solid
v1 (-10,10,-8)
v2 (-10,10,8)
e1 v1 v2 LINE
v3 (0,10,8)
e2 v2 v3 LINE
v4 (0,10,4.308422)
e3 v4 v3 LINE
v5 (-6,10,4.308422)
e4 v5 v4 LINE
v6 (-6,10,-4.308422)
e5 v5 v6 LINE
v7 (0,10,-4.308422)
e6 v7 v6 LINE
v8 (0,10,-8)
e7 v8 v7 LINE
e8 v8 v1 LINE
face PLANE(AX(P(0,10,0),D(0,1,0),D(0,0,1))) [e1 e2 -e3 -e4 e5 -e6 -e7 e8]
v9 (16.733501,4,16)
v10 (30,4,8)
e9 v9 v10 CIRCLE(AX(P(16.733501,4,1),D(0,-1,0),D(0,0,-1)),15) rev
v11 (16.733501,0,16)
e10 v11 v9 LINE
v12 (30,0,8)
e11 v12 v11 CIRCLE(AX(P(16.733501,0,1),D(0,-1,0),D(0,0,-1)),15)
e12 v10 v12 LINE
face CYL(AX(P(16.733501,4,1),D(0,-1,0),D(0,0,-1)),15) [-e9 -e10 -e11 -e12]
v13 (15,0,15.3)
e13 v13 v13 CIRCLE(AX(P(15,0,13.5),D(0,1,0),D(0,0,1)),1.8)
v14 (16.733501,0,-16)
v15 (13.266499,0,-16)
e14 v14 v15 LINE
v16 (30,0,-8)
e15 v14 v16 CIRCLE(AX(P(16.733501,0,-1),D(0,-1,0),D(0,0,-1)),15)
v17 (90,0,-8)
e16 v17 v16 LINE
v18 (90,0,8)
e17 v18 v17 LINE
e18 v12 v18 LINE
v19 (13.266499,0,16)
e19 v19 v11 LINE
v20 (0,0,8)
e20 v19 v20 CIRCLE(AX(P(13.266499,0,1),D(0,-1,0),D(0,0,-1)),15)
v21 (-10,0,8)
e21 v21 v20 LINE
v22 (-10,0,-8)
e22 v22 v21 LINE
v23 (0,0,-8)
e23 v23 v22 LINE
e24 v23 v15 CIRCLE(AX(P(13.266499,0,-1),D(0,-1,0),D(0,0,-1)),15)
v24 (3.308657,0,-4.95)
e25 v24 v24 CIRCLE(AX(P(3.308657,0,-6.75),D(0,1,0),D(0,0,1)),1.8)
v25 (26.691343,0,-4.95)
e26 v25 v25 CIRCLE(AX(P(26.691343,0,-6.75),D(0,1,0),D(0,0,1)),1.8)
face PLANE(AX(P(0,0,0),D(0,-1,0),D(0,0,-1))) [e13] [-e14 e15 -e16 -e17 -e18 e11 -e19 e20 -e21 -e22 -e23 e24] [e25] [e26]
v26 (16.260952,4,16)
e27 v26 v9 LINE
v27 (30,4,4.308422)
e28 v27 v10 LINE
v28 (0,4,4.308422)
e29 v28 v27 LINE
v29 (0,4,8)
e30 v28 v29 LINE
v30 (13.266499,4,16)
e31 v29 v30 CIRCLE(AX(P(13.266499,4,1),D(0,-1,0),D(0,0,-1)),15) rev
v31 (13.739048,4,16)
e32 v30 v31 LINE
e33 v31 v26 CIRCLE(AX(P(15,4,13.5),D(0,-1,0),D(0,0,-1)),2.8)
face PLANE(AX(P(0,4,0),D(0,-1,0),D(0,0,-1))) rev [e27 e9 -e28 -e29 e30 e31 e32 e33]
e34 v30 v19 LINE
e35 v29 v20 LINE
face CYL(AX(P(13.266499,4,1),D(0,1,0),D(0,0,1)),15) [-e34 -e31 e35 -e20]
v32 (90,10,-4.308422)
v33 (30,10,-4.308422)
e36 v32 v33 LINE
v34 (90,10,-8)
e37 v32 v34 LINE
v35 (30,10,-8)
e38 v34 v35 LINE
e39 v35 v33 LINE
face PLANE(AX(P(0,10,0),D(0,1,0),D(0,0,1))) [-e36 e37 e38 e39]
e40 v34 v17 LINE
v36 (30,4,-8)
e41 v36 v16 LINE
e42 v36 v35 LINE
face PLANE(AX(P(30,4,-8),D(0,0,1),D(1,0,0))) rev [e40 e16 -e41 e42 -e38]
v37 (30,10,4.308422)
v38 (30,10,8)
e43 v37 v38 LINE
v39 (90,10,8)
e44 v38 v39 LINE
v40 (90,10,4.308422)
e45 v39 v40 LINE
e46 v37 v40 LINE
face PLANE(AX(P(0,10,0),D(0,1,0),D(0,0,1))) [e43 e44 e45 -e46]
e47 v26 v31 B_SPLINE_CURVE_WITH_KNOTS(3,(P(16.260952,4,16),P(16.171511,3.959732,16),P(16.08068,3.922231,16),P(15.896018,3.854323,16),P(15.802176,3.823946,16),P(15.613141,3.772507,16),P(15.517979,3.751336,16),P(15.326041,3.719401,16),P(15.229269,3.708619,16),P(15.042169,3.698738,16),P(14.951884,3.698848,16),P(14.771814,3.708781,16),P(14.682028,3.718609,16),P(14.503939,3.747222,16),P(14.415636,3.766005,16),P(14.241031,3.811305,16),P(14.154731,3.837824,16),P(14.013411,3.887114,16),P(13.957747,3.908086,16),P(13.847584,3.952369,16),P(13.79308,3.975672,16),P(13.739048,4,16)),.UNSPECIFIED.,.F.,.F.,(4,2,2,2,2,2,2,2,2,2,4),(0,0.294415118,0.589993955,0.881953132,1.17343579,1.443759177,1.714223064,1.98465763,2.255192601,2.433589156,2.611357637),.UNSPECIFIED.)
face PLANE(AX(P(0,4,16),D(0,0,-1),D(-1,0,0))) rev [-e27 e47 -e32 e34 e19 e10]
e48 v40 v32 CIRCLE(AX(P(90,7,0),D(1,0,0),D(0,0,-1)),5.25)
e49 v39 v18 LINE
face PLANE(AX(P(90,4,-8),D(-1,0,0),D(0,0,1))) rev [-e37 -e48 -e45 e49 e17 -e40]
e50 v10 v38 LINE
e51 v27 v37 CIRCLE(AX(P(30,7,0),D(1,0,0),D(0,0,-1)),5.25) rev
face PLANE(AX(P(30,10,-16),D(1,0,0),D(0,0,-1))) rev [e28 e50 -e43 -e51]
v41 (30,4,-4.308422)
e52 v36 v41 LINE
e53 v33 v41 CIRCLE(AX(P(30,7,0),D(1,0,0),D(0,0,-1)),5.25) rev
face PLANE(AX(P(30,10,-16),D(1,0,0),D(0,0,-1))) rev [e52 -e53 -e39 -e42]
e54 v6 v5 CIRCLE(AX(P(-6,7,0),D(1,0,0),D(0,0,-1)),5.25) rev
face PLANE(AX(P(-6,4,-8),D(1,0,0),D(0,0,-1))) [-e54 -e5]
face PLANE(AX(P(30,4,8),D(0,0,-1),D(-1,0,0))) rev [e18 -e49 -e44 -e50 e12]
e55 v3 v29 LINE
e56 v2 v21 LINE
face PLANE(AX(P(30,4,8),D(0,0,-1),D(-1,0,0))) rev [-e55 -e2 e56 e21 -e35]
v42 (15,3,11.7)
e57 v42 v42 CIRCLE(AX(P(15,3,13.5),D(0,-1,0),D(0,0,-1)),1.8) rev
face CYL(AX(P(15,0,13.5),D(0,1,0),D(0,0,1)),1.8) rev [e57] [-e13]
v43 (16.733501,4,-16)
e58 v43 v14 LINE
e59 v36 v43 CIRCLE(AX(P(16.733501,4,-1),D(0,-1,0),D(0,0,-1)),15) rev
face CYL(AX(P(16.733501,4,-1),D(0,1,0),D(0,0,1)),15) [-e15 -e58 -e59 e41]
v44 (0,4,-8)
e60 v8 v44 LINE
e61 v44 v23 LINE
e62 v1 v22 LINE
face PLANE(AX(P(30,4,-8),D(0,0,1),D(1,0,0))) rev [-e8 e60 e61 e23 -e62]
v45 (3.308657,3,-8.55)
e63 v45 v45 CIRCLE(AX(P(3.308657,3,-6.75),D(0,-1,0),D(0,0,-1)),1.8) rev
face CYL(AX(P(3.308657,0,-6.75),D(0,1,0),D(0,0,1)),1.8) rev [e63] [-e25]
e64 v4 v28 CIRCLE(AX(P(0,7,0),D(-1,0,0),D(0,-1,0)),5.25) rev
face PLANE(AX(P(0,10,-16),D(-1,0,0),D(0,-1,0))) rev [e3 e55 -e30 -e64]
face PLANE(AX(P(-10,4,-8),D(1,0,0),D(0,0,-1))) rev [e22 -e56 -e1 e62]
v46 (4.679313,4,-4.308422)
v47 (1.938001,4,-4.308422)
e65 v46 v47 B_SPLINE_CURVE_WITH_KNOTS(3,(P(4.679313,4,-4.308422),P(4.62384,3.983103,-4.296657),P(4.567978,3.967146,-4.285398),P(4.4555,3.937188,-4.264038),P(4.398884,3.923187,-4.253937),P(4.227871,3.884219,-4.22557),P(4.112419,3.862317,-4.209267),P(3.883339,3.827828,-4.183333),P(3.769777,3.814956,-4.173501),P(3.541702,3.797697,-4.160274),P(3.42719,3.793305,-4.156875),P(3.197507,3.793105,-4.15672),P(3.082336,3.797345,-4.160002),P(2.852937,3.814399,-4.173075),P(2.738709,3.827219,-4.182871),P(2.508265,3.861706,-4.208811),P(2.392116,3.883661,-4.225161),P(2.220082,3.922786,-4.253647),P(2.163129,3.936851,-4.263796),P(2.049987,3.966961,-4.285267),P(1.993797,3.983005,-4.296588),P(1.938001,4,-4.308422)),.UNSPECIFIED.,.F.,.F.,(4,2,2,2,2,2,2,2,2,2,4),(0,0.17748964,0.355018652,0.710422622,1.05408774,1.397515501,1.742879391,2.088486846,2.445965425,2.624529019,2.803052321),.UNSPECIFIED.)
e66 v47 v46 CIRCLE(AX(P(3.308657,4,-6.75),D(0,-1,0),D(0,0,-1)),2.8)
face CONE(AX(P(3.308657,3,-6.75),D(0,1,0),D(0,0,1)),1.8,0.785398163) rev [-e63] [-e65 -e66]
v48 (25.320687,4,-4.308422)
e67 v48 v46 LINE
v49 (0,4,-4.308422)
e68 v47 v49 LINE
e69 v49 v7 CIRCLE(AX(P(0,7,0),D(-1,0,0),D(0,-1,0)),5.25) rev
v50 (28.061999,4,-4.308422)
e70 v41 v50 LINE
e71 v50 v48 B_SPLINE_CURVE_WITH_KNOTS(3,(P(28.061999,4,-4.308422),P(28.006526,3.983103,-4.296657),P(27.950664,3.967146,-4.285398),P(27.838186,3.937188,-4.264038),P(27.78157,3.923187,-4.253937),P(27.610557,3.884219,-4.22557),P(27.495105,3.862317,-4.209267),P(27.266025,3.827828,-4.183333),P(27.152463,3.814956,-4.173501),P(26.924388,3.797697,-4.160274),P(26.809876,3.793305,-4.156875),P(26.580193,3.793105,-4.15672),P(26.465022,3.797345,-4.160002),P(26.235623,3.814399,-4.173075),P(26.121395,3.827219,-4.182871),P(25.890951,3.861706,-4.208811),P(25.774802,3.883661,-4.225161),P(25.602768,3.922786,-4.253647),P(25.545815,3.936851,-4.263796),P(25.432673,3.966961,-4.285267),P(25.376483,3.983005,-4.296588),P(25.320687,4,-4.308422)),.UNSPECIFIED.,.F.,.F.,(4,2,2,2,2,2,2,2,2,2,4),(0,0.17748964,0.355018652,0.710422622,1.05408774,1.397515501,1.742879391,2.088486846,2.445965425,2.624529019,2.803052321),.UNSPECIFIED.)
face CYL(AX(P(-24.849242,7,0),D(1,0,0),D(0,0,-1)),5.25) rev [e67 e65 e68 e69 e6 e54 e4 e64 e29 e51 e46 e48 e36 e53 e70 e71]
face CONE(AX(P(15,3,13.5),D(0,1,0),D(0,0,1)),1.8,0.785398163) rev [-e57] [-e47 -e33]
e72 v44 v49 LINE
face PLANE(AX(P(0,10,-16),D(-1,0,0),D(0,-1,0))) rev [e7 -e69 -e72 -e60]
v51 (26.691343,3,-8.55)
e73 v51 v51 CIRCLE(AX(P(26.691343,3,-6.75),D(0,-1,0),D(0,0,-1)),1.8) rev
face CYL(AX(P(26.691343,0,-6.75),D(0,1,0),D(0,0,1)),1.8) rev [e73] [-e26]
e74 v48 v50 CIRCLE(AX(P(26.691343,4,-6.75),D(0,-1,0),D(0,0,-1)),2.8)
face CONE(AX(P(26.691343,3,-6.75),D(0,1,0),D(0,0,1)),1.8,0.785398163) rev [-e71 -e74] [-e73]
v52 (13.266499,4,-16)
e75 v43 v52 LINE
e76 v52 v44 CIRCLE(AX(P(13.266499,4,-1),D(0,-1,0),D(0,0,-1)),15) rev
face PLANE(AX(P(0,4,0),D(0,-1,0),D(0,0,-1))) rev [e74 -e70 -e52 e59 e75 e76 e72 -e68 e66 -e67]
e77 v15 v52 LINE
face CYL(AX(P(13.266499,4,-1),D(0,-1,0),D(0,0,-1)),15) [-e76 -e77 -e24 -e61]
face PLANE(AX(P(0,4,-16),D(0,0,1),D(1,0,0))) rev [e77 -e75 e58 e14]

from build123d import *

# Parameters (mm, degrees)
EXTRUDE_2_DEPTH     = 4
SKETCH_7_W          = 100
SKETCH_7_H          = 16
EXTRUDE_3_DEPTH     = 6
SKETCH_8_R          = 5.25
CUT_EXTRUDE_3_DEPTH = 96
SKETCH_9_W          = 30
SKETCH_9_H          = 6
CUT_EXTRUDE_4_DEPTH = 94.680307429
SKETCH_10_R         = 1.8
CUT_EXTRUDE_5_DEPTH = 92.607859925
FILLET_3_R          = 15
CHAMFER_1_SIZE      = 1


with BuildPart() as part:
    # Эскиз6 → Бобышка-Вытянуть2 (new body)
    with BuildSketch(Plane(origin=(0, 0, 0), x_dir=(1, 0, 0), z_dir=(0, 1, 0))):
        Polygon((0, 16), (0, 8), (-10, 8), (-10, -8), (0, -8), (0, -16), (30, -16), (30, -8), (90, -8), (90, 8), (30, 8), (30, 16), align=None)
    extrude(amount=EXTRUDE_2_DEPTH)

    # Эскиз7 → Бобышка-Вытянуть3 (add)
    with BuildSketch(Plane(origin=(0, 4, 0), x_dir=(1, 0, 0), z_dir=(0, 1, 0))):
        with Locations((40, 0)):
            Rectangle(SKETCH_7_W, SKETCH_7_H)
    extrude(amount=EXTRUDE_3_DEPTH)

    # Эскиз8 → Вырез-Вытянуть3 (cut)
    with BuildSketch(Plane(origin=(90, 0, 0), x_dir=(0, 0, -1), z_dir=(1, 0, 0))):
        with Locations((0, 7)):
            Circle(SKETCH_8_R)
    extrude(amount=-CUT_EXTRUDE_3_DEPTH, mode=Mode.SUBTRACT)

    # Эскиз9 → Вырез-Вытянуть4 (cut, through all)
    with BuildSketch(Plane.XY.offset(8)):
        with Locations((15, 7)):
            Rectangle(SKETCH_9_W, SKETCH_9_H)
    extrude(amount=-CUT_EXTRUDE_4_DEPTH, mode=Mode.SUBTRACT)

    # Эскиз10 → Вырез-Вытянуть5 (cut, through all)
    with BuildSketch(Plane(origin=(0, 4, 0), x_dir=(1, 0, 0), z_dir=(0, 1, 0))):
        with Locations(Location((15, -13.5, 0), (0, 0, 270))):
            Circle(SKETCH_10_R)
        with Locations(Location((3.308657049, 6.75, 0), (0, 0, 270))):
            Circle(SKETCH_10_R)
        with Locations(Location((26.691342951, 6.75, 0), (0, 0, 270))):
            Circle(SKETCH_10_R)
    extrude(amount=-CUT_EXTRUDE_5_DEPTH, mode=Mode.SUBTRACT)

    # Скругление3
    # the kernel refuses this fillet: 15 mm, written as the material it takes off along each edge
    with BuildSketch(Plane(origin=(30, -33.166247904, -16), x_dir=(-1, 0, 0), z_dir=(0, 1, 0))) as fillet_3_piece_1:
        with BuildLine():
            CenterArc((13.266499161, 15), FILLET_3_R, 207.818139285, 62.181860715)
            Line((0, 8), (-0.265329983, 7.86))
            ThreePointArc((-0.265329983, 7.86), (-0.3, 4), (-0.3, 0))
            Line((-0.3, 0), (0, -0.3))
            Line((0, -0.3), (13.266499161, -0.3))
            Line((13.266499161, -0.3), (13.266499161, 0))
        make_face()
    extrude(amount=70.332495807, mode=Mode.SUBTRACT)
    with BuildSketch(Plane(origin=(0, -33.166247904, -16), x_dir=(0, 0, 1), z_dir=(0, 1, 0))) as fillet_3_piece_2:
        with BuildLine():
            CenterArc((15, 13.266499161), FILLET_3_R, 180, 62.181860715)
            Line((0, 13.266499161), (-0.3, 13.266499161))
            Line((-0.3, 13.266499161), (-0.3, 0))
            Line((-0.3, 0), (0, -0.3))
            ThreePointArc((0, -0.3), (4, -0.3), (7.86, -0.265329983))
            Line((7.86, -0.265329983), (8, 0))
        make_face()
    extrude(amount=70.332495807, mode=Mode.SUBTRACT)
    with BuildSketch(Plane(origin=(30, -33.166247904, 16), x_dir=(-1, 0, 0), z_dir=(0, 1, 0))) as fillet_3_piece_3:
        with BuildLine():
            CenterArc((13.266499161, -15), FILLET_3_R, 90, 62.181860715)
            Line((0, -8), (-0.265329983, -7.86))
            ThreePointArc((-0.265329983, -7.86), (-0.3, -4), (-0.3, 0))
            Line((-0.3, 0), (0, 0.3))
            Line((0, 0.3), (13.266499161, 0.3))
            Line((13.266499161, 0.3), (13.266499161, 0))
        make_face()
    extrude(amount=70.332495807, mode=Mode.SUBTRACT)
    with BuildSketch(Plane(origin=(0, -33.166247904, 16), x_dir=(0, 0, -1), z_dir=(0, 1, 0))) as fillet_3_piece_4:
        with BuildLine():
            CenterArc((15, -13.266499161), FILLET_3_R, 117.818139285, 62.181860715)
            Line((0, -13.266499161), (-0.3, -13.266499161))
            Line((-0.3, -13.266499161), (-0.3, 0))
            Line((-0.3, 0), (0, 0.3))
            ThreePointArc((0, 0.3), (4, 0.3), (7.86, 0.265329983))
            Line((7.86, 0.265329983), (8, 0))
        make_face()
    extrude(amount=70.332495807, mode=Mode.SUBTRACT)

    # Фаска1
    # the kernel refuses this chamfer: 1 mm, written as the material it takes off along each edge
    with BuildSketch(Plane(origin=(3.308657049, 4, -6.75), x_dir=(0, 0, 1), z_dir=(-1, 0, 0))) as chamfer_1_piece_1:
        Polygon((1.8, -CHAMFER_1_SIZE), (1.8 + CHAMFER_1_SIZE, 0), (1.8, 0), align=None)
    revolve(axis=Axis((3.308657049, 4, -6.75), (0, 1, 0)), mode=Mode.SUBTRACT)
    with BuildSketch(Plane(origin=(26.691342951, 4, -6.75), x_dir=(0, 0, 1), z_dir=(-1, 0, 0))) as chamfer_1_piece_2:
        Polygon((1.8, -CHAMFER_1_SIZE), (1.8 + CHAMFER_1_SIZE, 0), (1.8, 0), align=None)
    revolve(axis=Axis((26.691342951, 4, -6.75), (0, 1, 0)), mode=Mode.SUBTRACT)
    with BuildSketch(Plane(origin=(15, 4, 13.5), x_dir=(0, 0, 1), z_dir=(-1, 0, 0))) as chamfer_1_piece_3:
        Polygon((1.8, -CHAMFER_1_SIZE), (1.8 + CHAMFER_1_SIZE, 0), (1.8, 0), align=None)
    revolve(axis=Axis((15, 4, 13.5), (0, 1, 0)), mode=Mode.SUBTRACT)


solid = part.part
